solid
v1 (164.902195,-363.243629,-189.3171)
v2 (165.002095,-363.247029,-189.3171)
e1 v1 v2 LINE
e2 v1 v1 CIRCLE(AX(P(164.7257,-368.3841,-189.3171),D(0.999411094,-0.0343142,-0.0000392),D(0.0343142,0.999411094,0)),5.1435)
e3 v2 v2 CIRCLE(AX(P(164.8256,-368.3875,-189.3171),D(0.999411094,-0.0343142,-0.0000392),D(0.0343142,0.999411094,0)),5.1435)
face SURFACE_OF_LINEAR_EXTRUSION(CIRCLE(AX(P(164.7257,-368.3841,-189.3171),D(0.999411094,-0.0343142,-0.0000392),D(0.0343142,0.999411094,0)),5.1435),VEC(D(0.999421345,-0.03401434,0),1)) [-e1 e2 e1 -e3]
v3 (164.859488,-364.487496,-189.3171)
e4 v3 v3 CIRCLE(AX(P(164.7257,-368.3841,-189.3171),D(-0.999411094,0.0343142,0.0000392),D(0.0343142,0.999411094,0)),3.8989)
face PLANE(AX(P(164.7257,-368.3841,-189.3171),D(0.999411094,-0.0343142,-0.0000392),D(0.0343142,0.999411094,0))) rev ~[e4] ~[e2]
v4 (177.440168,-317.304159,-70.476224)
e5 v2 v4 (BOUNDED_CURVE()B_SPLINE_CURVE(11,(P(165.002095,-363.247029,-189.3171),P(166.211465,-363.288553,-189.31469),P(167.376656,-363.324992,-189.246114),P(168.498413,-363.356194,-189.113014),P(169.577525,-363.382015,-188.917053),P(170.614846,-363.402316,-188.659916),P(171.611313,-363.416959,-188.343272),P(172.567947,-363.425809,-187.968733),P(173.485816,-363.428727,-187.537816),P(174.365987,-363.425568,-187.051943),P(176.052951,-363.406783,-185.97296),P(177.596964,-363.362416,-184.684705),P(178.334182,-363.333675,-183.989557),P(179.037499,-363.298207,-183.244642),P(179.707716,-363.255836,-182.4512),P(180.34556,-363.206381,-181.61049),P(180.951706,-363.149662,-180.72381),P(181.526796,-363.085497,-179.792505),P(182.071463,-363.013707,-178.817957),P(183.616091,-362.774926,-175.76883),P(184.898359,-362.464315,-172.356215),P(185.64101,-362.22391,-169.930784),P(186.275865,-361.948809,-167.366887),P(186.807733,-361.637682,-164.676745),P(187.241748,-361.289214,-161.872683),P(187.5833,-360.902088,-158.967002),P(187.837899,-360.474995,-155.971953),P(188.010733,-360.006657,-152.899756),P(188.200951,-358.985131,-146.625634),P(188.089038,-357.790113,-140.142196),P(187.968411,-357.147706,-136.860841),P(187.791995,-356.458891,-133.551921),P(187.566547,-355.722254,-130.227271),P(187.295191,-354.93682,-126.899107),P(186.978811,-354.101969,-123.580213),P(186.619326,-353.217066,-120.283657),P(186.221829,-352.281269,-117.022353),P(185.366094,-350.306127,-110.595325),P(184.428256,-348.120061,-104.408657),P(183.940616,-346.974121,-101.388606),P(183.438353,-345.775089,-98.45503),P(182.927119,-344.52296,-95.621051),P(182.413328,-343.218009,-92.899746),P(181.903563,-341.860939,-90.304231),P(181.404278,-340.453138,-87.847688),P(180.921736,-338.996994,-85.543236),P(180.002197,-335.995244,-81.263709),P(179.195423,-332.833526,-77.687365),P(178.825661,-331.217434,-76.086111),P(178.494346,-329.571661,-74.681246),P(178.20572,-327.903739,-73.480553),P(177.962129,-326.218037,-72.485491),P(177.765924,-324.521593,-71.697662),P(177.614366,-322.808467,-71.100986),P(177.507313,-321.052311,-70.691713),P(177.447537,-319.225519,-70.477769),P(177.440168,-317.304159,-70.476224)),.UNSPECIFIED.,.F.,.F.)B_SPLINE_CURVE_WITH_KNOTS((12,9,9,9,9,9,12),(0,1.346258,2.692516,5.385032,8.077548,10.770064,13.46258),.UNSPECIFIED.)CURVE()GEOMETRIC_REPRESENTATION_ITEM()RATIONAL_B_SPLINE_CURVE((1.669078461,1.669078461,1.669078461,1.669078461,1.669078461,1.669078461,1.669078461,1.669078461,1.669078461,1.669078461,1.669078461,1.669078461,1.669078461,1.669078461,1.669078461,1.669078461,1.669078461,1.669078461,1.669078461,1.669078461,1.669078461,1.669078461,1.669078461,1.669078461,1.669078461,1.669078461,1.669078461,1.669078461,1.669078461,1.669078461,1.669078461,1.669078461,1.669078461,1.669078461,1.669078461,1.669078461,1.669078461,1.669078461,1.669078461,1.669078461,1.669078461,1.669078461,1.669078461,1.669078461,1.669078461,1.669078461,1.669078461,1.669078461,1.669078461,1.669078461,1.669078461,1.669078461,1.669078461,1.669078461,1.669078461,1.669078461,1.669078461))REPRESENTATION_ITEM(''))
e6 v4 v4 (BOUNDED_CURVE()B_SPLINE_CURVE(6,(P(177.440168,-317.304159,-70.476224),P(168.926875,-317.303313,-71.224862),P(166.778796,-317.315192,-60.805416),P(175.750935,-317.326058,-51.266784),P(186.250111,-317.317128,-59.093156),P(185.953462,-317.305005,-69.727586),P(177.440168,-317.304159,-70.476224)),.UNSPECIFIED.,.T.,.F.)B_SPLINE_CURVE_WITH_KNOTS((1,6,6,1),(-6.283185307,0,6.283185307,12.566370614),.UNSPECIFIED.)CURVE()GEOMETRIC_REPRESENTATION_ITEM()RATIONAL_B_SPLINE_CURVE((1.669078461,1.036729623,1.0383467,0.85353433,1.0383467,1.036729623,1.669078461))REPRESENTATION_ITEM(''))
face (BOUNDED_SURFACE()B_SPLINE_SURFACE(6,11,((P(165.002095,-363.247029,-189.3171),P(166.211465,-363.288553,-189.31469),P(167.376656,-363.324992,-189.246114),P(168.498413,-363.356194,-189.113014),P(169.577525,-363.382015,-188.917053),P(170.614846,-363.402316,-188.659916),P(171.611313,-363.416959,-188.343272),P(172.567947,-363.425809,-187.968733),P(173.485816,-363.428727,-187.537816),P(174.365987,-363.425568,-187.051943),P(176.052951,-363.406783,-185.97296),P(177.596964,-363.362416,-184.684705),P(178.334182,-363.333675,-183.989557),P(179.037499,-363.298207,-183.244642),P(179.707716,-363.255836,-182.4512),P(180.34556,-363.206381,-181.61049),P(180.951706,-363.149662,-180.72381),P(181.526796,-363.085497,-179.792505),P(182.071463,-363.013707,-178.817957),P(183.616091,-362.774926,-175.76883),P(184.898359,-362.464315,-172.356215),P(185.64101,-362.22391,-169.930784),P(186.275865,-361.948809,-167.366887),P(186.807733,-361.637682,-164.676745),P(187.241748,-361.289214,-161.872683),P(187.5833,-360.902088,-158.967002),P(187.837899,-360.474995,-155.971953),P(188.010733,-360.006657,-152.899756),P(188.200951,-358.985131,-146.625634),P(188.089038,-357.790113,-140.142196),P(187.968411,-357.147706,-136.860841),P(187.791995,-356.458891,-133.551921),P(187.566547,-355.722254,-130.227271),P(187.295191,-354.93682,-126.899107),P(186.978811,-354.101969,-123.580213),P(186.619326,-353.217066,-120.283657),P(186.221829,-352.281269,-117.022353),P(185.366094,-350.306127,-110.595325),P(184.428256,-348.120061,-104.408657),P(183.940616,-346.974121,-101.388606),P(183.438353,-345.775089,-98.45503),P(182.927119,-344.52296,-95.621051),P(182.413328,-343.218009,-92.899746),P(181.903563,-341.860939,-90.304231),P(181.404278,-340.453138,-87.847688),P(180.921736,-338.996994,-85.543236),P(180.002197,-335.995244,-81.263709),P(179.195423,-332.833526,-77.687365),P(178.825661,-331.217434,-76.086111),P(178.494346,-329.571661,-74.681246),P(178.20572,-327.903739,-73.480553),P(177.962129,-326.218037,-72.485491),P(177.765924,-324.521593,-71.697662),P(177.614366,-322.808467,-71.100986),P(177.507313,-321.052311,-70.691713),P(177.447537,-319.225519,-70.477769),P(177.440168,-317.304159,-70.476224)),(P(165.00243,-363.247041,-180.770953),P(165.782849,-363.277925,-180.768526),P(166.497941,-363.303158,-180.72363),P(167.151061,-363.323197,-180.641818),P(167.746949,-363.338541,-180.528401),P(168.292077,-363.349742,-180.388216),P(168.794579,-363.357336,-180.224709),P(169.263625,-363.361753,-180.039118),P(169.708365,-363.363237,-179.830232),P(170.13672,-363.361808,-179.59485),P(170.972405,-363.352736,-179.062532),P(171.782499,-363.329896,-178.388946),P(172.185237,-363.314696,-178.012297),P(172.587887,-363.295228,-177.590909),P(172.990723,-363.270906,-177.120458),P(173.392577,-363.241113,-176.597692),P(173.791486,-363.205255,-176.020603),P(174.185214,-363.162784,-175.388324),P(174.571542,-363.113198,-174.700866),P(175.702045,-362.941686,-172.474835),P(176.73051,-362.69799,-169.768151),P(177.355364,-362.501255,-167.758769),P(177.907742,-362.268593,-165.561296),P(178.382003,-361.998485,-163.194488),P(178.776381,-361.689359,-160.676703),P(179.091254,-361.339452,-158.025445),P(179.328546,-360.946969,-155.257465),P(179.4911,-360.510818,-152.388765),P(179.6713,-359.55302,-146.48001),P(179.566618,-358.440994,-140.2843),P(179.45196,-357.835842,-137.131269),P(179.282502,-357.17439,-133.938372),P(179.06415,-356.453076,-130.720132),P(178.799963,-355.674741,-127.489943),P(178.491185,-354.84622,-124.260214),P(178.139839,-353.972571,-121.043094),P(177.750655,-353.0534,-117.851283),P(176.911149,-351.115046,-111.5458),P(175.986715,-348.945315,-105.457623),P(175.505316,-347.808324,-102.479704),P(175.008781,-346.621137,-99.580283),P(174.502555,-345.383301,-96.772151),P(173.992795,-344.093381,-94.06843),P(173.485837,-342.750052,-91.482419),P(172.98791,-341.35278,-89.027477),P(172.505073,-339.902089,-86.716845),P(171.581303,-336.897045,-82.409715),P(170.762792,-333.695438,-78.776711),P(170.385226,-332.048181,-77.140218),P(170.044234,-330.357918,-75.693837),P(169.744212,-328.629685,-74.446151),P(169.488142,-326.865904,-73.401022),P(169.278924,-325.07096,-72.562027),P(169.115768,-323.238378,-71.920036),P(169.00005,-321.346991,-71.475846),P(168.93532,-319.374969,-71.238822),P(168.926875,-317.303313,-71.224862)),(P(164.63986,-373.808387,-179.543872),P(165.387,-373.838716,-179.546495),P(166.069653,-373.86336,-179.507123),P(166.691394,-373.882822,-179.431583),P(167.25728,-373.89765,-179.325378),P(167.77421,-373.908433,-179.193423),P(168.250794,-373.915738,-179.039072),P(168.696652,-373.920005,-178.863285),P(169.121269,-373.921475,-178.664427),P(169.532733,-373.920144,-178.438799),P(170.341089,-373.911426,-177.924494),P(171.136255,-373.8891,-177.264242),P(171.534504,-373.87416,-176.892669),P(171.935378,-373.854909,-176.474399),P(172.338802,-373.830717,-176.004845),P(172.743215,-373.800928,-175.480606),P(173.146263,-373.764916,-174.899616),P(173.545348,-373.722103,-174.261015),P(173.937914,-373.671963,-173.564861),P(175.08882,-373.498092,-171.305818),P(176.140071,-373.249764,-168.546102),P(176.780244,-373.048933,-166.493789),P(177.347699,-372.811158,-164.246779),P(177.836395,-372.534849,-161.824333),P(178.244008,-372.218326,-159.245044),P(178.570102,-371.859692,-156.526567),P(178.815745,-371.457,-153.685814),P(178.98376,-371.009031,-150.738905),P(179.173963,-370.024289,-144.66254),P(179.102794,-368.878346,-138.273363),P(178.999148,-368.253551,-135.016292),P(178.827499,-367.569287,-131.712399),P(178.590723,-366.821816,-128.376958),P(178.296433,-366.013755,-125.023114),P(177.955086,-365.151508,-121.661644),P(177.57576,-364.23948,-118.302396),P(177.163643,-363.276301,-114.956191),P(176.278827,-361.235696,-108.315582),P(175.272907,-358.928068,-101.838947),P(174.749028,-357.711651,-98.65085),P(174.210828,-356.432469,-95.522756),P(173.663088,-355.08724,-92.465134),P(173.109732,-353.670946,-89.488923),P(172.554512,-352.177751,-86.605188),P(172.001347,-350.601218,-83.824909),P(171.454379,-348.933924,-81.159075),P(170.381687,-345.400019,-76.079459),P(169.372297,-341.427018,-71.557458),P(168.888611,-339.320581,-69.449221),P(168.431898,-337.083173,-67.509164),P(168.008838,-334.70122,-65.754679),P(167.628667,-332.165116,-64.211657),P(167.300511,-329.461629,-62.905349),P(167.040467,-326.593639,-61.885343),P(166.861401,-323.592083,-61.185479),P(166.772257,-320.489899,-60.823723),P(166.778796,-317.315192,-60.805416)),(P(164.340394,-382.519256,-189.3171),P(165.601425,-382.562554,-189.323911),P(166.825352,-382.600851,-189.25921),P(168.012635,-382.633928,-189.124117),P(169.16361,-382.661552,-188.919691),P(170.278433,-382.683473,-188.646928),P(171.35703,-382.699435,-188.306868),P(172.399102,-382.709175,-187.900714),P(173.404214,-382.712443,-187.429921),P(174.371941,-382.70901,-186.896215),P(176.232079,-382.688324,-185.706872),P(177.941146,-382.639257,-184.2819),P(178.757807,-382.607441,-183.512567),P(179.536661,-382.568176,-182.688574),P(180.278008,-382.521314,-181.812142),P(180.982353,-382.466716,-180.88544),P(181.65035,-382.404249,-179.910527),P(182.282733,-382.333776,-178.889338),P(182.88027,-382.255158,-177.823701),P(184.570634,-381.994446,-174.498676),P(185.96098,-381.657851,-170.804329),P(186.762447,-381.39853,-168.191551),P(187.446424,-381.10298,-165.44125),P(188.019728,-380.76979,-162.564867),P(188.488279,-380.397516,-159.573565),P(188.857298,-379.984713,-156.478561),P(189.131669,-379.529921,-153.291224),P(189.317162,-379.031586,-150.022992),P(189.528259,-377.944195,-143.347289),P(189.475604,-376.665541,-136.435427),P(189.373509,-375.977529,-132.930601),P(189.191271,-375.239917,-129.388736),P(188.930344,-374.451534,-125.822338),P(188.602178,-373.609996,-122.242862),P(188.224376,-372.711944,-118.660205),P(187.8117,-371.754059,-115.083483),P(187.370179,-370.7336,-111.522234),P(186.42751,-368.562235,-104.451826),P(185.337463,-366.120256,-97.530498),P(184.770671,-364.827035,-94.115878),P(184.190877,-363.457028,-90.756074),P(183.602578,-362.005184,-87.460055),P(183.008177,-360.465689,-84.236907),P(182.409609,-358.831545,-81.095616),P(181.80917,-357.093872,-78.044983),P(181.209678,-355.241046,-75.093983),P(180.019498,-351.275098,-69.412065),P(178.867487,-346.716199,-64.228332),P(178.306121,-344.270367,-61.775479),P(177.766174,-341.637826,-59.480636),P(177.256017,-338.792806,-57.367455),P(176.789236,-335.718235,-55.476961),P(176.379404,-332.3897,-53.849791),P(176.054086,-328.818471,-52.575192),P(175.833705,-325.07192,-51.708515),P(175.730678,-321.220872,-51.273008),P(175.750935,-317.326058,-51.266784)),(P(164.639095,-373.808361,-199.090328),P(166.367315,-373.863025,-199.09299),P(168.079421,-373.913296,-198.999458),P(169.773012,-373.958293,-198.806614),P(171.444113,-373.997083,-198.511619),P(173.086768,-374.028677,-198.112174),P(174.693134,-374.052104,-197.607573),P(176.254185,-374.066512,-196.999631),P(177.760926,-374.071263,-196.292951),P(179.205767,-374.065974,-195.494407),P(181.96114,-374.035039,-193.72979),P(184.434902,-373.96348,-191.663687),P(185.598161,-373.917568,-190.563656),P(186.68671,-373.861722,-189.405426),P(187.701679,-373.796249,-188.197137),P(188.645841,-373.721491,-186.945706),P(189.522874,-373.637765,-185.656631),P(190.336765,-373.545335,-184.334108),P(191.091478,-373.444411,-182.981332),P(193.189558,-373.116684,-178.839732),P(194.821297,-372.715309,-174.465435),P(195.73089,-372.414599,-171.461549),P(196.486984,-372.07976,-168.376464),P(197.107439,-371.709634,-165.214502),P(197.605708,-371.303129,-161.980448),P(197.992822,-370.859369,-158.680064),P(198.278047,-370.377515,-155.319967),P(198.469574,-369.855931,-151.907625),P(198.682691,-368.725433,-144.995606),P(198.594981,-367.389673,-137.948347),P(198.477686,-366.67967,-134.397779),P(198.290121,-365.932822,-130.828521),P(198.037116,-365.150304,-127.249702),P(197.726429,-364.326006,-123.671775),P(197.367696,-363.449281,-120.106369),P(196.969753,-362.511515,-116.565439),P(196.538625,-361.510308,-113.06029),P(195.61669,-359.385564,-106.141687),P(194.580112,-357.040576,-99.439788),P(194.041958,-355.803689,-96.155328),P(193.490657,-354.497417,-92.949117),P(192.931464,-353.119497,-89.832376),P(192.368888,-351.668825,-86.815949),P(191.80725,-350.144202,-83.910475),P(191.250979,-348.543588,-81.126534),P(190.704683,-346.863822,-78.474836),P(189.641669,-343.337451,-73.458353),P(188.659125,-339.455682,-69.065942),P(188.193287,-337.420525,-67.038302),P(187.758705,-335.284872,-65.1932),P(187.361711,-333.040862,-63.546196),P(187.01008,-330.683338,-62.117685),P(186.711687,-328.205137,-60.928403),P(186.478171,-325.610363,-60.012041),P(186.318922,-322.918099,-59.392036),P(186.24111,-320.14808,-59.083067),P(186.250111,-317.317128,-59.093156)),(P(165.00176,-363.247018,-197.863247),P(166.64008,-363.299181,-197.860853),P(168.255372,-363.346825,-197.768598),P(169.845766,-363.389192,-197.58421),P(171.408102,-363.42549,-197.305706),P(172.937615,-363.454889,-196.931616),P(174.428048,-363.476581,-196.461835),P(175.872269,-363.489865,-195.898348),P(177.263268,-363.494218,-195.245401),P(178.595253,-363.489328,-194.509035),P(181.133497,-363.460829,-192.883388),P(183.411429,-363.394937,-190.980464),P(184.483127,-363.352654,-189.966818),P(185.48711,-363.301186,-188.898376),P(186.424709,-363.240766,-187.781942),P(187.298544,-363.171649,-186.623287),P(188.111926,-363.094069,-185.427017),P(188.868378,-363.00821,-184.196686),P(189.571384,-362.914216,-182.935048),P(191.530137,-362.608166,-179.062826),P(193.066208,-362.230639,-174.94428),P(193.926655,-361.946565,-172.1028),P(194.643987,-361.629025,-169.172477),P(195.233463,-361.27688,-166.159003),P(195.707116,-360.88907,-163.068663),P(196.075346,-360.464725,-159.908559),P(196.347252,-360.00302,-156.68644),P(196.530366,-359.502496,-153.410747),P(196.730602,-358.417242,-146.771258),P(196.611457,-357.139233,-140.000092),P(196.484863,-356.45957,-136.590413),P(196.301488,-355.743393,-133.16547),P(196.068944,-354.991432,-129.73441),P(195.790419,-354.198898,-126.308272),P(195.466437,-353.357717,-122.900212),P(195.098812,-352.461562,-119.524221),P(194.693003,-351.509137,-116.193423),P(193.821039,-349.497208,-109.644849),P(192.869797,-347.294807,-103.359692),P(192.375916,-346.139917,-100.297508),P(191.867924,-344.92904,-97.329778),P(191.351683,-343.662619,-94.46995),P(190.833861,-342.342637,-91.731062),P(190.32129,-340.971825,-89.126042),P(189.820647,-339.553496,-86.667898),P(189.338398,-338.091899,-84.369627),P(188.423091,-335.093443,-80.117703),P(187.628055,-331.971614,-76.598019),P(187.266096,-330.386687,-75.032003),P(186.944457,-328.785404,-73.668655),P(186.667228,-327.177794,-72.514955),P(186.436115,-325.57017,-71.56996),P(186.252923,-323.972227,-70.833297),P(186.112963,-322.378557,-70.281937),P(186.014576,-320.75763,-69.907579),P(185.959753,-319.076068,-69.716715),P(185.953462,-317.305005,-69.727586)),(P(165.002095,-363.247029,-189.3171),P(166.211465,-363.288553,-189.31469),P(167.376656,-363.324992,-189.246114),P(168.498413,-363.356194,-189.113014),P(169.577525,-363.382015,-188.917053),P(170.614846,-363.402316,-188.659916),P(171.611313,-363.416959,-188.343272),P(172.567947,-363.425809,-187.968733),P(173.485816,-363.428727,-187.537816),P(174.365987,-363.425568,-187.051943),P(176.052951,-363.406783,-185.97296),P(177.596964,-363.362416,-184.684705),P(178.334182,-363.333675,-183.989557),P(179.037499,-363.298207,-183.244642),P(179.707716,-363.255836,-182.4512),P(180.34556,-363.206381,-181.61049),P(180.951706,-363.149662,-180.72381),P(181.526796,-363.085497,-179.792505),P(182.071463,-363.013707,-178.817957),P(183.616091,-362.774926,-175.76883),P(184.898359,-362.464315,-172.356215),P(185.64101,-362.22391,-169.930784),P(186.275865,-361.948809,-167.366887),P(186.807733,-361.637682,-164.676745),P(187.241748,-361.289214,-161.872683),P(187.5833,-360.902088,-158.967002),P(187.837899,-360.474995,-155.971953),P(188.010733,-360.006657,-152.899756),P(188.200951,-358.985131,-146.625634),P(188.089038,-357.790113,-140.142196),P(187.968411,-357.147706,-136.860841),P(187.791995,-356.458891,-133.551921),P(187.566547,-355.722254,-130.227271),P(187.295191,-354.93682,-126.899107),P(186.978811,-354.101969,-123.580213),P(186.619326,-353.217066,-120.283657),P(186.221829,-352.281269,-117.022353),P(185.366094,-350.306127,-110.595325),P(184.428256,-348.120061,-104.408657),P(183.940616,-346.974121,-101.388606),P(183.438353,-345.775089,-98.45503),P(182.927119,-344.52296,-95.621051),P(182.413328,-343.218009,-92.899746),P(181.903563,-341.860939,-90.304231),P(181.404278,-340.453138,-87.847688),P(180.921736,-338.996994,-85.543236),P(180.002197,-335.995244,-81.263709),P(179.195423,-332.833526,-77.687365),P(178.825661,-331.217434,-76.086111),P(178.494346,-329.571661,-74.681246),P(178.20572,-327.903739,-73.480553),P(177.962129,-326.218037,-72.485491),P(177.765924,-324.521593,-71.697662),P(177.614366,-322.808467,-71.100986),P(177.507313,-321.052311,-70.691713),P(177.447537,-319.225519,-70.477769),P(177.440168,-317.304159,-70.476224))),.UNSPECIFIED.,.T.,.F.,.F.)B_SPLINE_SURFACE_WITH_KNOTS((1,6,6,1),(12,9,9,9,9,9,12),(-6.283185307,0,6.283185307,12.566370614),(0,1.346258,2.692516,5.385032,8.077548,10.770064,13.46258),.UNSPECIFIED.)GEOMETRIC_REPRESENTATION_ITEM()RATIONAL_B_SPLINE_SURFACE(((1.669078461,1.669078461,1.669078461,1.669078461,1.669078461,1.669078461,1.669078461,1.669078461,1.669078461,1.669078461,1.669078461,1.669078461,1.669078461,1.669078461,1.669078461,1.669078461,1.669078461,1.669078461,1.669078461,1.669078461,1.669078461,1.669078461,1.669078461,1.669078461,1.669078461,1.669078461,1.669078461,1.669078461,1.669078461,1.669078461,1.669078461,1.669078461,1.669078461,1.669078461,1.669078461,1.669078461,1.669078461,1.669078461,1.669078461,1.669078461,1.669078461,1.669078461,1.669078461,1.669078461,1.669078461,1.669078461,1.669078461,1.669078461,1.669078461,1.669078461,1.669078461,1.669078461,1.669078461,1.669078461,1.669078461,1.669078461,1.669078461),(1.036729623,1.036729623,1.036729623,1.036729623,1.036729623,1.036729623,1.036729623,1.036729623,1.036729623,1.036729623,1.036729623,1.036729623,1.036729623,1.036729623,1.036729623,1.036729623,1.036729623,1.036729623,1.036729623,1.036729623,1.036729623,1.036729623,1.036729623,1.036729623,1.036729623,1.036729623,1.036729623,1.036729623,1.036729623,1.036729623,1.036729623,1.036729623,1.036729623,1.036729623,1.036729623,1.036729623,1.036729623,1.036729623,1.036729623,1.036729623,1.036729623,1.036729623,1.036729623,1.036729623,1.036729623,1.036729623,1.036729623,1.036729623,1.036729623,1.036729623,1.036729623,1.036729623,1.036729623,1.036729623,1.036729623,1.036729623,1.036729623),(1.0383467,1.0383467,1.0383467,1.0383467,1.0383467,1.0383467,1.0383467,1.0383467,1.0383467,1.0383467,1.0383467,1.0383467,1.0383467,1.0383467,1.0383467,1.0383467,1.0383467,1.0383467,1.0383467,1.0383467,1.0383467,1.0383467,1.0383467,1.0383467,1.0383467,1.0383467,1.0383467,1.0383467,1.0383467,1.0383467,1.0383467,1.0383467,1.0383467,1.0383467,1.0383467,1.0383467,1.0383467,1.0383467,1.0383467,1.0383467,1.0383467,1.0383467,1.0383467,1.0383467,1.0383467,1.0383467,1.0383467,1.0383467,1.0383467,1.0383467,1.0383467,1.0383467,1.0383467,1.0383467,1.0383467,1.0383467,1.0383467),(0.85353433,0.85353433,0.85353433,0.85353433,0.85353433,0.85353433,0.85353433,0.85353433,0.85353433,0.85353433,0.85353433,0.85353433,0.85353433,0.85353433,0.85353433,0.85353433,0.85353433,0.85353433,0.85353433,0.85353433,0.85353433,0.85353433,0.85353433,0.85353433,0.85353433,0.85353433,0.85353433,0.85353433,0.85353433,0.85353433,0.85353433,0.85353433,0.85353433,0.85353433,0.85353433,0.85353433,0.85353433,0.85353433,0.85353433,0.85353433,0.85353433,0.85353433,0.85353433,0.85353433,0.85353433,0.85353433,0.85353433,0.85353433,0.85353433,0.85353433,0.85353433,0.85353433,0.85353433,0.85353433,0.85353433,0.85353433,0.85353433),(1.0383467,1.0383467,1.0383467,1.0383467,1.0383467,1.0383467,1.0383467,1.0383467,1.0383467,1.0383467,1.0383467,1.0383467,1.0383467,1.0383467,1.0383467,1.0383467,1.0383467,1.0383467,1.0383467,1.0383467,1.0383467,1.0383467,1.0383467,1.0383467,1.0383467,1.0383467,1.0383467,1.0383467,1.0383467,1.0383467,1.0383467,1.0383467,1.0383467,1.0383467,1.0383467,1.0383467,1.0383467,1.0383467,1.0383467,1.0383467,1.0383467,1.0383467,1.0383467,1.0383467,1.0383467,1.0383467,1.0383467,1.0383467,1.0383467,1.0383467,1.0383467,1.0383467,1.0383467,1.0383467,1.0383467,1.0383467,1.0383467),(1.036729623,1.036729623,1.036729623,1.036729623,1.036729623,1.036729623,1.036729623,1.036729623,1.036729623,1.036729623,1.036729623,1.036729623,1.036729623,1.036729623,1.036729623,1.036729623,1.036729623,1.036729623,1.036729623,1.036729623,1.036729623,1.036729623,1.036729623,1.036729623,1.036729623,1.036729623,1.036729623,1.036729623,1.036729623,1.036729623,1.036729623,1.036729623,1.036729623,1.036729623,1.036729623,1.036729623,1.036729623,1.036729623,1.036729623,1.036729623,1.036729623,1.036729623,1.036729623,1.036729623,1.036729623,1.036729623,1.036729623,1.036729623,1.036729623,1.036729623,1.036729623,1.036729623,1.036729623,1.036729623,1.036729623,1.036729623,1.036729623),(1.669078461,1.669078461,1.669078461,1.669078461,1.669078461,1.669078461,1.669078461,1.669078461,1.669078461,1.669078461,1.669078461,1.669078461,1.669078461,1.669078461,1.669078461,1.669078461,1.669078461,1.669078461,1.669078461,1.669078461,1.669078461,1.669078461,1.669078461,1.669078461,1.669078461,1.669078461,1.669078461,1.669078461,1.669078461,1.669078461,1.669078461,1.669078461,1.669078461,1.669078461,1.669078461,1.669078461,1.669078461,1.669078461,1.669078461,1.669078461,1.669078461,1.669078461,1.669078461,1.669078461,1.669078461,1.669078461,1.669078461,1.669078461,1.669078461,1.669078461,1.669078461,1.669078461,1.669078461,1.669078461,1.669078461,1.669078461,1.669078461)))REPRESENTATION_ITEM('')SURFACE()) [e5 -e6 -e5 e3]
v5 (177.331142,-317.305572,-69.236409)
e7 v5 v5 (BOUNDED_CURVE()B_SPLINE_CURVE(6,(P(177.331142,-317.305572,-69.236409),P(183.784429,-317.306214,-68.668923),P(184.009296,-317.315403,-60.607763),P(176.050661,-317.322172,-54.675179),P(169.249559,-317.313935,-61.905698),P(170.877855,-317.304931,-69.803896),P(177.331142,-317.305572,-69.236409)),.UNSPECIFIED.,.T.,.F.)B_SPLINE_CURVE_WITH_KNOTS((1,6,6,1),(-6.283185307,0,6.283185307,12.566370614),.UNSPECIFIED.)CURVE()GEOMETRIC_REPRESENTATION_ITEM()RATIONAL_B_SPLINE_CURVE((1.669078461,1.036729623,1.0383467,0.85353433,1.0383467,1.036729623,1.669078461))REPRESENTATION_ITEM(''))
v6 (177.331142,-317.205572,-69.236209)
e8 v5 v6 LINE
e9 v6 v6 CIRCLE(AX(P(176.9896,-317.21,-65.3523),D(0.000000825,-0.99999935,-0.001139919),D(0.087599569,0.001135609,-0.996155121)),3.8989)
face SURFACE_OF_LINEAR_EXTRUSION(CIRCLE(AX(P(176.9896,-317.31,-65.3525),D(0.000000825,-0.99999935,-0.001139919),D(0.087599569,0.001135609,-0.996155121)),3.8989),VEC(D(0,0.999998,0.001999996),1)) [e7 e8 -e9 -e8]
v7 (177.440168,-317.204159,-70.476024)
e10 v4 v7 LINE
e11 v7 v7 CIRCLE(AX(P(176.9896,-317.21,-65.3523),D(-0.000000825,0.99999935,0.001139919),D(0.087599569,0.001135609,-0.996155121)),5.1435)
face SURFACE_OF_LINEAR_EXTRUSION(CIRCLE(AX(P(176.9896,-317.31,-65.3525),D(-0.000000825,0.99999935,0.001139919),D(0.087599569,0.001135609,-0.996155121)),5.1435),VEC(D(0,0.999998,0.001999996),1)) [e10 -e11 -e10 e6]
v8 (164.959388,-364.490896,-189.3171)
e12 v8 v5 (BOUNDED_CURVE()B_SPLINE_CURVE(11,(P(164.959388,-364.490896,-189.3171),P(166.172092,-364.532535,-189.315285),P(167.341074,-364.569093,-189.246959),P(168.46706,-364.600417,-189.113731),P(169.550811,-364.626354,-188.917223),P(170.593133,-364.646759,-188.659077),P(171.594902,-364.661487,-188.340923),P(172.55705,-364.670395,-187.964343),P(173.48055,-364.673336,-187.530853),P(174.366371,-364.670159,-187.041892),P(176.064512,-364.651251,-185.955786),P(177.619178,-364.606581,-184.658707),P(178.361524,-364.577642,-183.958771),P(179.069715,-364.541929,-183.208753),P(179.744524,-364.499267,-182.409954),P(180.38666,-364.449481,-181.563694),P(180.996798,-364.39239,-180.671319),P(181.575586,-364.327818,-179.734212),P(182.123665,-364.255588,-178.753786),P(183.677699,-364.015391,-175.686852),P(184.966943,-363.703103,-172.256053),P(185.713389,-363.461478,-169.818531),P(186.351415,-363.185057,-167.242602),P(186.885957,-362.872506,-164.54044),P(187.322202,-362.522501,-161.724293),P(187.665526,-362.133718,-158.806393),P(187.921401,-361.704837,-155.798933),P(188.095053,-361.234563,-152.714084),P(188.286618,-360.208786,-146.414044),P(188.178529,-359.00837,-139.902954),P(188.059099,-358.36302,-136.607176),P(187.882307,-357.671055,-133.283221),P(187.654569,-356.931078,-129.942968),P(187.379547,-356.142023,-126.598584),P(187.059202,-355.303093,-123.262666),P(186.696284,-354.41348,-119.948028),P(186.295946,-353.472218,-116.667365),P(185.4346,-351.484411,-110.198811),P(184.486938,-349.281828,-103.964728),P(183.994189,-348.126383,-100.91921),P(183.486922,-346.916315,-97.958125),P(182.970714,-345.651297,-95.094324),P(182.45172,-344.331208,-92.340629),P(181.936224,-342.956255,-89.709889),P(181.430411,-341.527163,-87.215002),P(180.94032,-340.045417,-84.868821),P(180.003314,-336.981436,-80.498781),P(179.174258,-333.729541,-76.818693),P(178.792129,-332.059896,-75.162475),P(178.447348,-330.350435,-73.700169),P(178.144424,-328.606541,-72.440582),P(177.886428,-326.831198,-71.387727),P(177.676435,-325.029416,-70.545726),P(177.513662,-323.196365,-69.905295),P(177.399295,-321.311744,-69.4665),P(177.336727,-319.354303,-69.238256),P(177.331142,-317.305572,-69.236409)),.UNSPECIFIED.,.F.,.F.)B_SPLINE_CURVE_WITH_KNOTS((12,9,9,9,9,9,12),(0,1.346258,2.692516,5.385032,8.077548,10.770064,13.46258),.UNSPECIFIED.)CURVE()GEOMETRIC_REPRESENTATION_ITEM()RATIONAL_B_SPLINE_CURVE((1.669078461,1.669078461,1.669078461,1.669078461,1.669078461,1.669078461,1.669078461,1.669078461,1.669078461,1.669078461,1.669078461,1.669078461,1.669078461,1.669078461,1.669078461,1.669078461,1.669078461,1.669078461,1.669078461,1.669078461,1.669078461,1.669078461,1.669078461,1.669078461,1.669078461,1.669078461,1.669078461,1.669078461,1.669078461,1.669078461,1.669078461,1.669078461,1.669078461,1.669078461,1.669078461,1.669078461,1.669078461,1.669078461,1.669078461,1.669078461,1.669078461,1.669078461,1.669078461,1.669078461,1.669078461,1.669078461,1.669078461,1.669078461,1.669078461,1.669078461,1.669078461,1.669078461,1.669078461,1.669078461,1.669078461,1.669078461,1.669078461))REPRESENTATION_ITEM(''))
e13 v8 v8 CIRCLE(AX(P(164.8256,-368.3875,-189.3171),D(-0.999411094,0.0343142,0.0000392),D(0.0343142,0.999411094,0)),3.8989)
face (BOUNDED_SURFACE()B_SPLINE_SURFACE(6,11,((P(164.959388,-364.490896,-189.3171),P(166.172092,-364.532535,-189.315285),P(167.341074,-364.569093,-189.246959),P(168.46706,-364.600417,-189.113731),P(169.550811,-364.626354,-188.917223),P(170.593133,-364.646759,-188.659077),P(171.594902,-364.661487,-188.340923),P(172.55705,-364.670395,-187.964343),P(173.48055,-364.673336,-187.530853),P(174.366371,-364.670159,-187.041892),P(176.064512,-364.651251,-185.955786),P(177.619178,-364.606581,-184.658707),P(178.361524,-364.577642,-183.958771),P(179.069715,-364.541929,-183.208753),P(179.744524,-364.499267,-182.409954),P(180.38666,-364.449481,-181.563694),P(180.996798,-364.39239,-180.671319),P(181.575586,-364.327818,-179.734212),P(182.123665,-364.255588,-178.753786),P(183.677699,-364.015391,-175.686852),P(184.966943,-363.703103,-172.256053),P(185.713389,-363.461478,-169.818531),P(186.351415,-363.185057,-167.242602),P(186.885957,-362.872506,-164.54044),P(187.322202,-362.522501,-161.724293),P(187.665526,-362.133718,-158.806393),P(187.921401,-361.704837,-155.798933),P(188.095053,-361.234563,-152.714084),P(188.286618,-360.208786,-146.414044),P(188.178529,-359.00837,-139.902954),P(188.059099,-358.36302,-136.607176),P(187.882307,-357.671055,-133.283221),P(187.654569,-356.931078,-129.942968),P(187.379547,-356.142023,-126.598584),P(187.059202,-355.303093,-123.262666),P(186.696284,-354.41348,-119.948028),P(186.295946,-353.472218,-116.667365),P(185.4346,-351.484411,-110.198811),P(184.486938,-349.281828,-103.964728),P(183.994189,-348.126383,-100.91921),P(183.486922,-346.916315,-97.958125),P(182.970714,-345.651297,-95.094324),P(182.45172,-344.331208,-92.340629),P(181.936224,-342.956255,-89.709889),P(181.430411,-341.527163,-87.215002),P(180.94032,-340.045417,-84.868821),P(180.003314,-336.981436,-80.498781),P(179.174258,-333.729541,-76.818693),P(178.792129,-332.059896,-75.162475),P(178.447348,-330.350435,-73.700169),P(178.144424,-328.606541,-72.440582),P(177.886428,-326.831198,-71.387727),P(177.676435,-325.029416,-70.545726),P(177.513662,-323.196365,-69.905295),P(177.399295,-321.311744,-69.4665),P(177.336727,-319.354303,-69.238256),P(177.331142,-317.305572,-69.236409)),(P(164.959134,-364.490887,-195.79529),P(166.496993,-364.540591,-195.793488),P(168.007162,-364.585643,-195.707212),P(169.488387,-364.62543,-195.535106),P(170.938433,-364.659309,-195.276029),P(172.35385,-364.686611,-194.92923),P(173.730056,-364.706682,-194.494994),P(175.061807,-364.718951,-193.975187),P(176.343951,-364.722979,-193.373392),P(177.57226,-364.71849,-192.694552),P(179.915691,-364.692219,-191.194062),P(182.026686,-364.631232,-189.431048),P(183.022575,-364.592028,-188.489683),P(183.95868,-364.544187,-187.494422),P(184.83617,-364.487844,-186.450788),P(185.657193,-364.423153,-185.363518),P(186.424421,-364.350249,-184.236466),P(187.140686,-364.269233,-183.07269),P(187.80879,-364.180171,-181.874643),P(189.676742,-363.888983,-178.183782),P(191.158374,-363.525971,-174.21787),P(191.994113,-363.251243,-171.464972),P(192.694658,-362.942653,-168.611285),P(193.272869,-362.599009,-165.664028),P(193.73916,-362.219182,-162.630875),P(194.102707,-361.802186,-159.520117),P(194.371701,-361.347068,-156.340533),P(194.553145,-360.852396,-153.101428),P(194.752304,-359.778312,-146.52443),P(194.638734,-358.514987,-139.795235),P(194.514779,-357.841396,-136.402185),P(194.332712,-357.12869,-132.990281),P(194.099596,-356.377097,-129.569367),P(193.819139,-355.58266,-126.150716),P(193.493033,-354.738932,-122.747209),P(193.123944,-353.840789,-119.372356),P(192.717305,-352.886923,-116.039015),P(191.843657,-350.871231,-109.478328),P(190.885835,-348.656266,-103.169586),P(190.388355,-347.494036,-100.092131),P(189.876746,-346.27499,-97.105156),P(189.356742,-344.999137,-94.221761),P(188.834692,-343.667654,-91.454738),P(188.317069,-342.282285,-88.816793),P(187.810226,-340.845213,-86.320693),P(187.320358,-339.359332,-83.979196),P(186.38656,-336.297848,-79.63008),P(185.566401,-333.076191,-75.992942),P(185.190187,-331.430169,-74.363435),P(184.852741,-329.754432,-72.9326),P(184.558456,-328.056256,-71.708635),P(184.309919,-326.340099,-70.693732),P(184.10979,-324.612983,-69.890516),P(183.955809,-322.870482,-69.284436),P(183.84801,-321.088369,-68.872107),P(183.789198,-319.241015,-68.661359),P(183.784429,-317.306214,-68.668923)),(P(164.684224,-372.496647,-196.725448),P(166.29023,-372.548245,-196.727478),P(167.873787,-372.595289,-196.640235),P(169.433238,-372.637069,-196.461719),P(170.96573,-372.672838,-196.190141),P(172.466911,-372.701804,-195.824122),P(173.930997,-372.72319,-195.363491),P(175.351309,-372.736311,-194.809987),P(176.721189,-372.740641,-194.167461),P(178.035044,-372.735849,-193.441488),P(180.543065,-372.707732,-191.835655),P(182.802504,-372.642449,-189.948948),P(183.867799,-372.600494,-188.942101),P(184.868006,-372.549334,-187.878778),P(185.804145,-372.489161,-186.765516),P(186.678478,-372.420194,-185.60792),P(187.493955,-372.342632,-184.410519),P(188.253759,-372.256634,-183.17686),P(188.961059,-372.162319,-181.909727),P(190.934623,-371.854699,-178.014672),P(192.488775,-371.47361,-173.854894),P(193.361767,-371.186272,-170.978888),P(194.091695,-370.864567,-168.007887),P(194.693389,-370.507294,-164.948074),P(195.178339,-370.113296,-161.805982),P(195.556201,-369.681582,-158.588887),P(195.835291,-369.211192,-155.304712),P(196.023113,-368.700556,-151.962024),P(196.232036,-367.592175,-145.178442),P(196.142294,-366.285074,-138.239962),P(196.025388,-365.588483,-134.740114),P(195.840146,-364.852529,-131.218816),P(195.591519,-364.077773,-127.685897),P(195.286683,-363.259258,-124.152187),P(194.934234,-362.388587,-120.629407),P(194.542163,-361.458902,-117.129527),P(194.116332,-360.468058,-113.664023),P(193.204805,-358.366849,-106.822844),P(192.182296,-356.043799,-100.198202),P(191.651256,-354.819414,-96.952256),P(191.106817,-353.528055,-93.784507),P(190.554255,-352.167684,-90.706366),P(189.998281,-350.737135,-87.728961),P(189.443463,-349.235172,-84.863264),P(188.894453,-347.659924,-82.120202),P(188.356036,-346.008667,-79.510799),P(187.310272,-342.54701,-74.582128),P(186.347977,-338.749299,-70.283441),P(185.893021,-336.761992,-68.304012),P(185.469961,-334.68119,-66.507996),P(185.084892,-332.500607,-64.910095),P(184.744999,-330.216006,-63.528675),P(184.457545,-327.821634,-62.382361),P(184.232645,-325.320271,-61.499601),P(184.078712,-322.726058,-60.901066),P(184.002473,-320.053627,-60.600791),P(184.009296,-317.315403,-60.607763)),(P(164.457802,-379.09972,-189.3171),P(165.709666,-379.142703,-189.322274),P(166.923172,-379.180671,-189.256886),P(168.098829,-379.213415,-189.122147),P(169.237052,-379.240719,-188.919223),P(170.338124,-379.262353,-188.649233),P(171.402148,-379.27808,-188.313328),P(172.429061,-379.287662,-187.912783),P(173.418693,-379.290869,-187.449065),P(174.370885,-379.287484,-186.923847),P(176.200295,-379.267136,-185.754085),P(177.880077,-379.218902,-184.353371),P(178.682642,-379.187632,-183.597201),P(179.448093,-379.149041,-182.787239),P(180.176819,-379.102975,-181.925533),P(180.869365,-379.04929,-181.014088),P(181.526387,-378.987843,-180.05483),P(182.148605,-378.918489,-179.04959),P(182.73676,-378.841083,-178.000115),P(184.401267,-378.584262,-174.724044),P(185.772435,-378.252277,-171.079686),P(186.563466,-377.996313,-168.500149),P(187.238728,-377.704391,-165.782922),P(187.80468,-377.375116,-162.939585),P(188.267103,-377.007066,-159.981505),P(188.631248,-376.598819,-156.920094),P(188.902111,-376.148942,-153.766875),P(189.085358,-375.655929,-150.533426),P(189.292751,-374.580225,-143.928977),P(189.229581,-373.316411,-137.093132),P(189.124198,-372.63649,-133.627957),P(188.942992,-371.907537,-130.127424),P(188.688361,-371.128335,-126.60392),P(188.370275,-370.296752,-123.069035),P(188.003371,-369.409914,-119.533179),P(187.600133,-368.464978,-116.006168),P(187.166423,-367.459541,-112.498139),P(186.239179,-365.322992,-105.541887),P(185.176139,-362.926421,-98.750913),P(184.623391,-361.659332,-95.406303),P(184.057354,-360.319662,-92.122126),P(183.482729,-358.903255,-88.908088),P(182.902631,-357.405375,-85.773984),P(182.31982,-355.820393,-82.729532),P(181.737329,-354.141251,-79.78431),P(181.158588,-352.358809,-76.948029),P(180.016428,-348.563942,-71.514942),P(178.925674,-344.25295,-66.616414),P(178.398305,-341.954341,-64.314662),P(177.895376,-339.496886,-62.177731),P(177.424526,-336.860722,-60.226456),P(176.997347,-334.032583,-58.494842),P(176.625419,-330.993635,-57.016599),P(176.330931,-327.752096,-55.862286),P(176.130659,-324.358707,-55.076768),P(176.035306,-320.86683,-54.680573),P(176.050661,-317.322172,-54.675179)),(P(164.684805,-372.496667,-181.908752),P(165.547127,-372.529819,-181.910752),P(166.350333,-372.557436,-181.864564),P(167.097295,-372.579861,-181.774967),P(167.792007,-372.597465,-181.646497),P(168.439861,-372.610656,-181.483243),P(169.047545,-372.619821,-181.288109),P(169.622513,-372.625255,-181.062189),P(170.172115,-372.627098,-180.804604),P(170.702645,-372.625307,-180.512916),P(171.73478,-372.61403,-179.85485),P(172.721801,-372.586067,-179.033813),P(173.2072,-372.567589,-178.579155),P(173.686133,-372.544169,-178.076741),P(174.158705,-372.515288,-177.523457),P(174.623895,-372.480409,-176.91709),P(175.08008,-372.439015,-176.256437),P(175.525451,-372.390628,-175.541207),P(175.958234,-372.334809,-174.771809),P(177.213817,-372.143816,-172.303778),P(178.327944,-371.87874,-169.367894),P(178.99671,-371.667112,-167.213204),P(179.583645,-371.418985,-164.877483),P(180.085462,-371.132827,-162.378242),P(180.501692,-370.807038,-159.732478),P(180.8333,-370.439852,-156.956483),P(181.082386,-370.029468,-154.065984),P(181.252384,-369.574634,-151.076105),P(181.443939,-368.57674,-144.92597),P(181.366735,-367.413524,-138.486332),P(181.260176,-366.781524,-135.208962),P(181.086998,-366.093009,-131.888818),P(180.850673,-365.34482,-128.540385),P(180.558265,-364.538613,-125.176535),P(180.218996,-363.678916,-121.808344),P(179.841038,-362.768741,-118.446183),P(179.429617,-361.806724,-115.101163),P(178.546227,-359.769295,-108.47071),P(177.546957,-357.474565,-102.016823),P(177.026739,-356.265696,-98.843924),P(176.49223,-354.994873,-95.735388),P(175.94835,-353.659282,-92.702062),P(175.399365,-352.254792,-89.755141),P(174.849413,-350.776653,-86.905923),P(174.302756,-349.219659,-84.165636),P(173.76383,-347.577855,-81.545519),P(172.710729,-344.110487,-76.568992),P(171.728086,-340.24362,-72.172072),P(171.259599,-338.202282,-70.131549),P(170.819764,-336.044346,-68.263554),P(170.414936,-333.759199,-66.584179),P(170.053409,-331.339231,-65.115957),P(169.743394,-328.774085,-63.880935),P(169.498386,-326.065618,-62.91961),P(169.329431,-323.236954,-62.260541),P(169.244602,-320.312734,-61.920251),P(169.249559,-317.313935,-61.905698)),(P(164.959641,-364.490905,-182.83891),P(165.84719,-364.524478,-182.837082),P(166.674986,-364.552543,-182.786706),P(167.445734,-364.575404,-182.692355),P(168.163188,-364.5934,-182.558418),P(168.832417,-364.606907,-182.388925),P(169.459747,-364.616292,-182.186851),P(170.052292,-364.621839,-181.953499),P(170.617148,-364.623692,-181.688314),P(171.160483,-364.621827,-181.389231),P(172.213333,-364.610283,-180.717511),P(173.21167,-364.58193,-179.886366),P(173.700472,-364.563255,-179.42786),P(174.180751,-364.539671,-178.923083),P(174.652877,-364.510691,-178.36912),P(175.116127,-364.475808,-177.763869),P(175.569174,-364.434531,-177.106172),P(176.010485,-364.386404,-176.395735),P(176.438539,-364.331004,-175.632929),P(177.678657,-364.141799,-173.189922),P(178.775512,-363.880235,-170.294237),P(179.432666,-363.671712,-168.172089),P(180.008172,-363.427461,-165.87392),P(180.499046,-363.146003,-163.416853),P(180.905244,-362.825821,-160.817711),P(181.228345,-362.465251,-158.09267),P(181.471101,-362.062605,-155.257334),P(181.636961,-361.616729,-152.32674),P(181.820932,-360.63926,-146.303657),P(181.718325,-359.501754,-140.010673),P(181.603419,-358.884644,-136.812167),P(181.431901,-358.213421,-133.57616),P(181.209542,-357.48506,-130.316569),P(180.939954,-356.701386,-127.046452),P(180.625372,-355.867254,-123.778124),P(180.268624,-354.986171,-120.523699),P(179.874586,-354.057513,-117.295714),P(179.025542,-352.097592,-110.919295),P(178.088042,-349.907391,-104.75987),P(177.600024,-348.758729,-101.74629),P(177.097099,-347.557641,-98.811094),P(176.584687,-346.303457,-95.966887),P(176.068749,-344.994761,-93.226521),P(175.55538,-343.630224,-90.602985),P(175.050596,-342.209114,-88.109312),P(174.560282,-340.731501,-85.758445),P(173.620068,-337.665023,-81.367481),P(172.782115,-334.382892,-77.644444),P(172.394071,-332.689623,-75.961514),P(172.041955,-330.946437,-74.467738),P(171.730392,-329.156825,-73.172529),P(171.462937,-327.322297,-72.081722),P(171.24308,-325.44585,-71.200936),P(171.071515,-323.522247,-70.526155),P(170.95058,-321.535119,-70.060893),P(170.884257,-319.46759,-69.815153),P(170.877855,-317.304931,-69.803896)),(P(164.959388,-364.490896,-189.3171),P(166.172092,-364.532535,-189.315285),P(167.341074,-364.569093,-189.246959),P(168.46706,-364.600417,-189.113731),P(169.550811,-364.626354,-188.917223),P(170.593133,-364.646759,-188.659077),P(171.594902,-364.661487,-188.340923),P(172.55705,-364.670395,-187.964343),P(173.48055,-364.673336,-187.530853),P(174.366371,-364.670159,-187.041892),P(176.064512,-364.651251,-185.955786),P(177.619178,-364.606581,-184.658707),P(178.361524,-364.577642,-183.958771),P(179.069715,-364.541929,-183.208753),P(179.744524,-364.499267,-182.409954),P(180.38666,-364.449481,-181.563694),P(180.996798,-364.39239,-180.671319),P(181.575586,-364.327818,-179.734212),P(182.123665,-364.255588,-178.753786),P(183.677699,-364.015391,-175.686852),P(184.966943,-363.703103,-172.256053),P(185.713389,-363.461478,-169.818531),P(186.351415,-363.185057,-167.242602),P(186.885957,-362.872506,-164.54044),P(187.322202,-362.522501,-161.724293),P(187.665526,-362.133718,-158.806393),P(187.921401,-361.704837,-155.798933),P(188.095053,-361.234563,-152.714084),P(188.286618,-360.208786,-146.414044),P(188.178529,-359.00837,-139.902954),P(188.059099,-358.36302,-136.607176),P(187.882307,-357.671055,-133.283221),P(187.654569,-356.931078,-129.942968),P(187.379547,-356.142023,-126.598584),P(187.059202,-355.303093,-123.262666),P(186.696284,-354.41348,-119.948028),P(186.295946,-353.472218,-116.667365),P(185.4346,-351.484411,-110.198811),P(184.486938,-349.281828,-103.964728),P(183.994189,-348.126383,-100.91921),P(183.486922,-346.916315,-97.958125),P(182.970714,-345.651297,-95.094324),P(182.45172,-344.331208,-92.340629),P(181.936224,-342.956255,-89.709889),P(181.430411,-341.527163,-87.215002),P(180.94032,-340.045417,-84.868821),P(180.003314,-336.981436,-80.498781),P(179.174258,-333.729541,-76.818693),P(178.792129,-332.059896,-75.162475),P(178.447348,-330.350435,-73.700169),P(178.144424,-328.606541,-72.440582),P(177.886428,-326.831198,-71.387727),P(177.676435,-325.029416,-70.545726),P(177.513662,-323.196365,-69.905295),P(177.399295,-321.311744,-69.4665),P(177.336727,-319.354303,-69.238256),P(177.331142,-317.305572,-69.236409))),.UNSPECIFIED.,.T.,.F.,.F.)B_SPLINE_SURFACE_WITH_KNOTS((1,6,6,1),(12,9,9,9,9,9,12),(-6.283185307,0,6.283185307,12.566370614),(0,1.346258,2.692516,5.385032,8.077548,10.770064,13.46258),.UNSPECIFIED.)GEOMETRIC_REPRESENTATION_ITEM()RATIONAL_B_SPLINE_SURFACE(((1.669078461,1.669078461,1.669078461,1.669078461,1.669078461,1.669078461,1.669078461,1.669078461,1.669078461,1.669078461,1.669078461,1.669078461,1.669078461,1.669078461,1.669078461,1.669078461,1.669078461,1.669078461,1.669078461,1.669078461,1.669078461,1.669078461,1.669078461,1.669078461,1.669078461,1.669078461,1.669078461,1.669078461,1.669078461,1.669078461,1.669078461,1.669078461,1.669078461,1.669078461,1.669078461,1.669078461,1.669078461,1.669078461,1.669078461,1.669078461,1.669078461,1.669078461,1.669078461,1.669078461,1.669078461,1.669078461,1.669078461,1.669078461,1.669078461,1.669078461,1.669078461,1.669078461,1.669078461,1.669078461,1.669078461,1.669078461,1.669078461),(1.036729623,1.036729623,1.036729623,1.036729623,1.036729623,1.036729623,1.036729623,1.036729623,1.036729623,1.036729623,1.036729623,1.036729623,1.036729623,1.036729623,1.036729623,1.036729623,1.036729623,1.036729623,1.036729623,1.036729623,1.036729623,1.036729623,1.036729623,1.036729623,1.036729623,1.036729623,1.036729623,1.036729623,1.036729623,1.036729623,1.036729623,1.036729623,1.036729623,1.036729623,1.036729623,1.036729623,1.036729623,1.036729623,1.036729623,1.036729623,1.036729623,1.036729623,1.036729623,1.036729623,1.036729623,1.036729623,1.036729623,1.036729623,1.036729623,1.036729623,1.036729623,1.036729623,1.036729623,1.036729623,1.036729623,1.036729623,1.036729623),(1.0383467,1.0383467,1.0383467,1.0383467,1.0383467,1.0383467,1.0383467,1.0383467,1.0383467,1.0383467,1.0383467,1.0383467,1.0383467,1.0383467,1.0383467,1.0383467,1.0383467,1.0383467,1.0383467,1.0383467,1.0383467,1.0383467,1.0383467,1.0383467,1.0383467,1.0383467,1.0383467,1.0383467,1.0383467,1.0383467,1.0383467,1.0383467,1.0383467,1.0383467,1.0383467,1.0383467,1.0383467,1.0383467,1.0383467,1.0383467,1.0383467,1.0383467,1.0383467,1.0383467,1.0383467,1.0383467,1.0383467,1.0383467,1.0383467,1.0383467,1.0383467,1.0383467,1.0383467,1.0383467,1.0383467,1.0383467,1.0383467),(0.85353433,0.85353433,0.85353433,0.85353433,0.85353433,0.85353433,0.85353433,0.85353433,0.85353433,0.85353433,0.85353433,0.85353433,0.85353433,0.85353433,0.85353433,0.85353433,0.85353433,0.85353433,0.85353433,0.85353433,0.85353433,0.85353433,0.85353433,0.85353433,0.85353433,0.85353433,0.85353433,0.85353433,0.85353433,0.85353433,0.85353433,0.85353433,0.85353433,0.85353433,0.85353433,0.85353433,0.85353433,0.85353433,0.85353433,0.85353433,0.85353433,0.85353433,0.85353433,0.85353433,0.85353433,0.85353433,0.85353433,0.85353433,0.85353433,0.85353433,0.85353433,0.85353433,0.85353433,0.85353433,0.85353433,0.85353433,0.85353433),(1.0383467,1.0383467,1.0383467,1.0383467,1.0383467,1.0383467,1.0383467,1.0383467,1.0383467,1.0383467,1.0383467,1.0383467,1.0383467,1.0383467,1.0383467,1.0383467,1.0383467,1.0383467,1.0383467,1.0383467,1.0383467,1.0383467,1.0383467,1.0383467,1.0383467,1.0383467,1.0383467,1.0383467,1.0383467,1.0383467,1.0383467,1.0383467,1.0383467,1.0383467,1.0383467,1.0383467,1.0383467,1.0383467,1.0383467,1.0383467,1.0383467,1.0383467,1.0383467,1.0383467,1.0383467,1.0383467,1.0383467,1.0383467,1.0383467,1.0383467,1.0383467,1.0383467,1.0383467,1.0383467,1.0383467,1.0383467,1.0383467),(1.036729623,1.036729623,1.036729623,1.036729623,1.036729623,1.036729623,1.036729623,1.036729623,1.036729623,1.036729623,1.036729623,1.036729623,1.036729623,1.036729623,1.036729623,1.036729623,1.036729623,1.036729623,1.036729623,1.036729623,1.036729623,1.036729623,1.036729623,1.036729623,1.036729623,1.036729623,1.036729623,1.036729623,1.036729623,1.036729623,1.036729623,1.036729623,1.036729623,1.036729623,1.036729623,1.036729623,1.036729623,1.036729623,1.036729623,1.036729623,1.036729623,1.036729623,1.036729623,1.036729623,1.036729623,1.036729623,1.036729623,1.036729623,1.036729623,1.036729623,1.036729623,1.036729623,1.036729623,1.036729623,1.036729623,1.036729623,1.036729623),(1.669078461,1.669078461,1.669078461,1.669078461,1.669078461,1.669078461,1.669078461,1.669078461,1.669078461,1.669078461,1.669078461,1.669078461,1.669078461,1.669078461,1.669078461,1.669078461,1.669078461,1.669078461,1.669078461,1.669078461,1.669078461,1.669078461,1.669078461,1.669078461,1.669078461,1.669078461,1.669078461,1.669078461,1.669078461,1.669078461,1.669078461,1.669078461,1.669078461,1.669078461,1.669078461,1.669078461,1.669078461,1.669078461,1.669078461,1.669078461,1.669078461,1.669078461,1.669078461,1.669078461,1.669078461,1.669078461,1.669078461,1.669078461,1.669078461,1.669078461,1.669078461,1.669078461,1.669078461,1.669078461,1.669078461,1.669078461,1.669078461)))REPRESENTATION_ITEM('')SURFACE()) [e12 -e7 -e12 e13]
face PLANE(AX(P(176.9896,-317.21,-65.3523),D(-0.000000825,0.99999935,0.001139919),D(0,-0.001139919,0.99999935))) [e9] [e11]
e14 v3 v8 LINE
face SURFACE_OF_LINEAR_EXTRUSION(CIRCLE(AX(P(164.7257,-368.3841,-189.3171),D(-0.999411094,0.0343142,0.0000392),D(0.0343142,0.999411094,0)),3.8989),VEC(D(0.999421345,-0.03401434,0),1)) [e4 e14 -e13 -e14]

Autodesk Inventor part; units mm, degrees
ref_plane "YZ Plane" through (0, 0, 0) normal (1, 0, 0) x (0, 1, 0)
ref_plane "XZ Plane" through (0, 0, 0) normal (0, 1, 0) x (-1, 0, 0)
ref_plane "XY Plane" through (0, 0, 0) normal (0, 0, 1) x (1, 0, 0)
ref_plane "Work Plane1" through (164.8256, -368.3875, -189.3171) normal (0.9994111, -0.0343142, -0.0000392) x (0.0343142, 0.9994111, 0)
sketch "Sketch3" plane through (164.8256, -368.3875, -189.3171) normal (0.9994111, -0.0343142, -0.0000392) x (0.0343142, 0.9994111, 0)
  circle A0 centre (0, 0) radius 5.1435
  circle A1 centre (0, 0) radius 3.8989
  point P0 (0, 0)
sketch3d "3D Sketch1"
  line L0 (164.7257, -368.3841, -189.3171) -> (164.8256, -368.3875, -189.3171)
  spline S0 degree 3 poles (164.8256, -368.3875, -189.3171) (209.6744, -369.9274, -189.3189) (176.9896, -362.1852, -65.4037) (176.9896, -317.31, -65.3525) knots 0 0 0 0 13.46258 13.46258 13.46258 13.46258
  line L1 (176.9896, -317.31, -65.3525) -> (176.9896, -317.21, -65.3523)
  dimension "d8" = 1
  dimension "d9" = 1
sweep "Sweep1" add profiles "Sketch3" path "3D Sketch1"
equation "\"OD\" = 10.287"
equation "\"t\" = 1.2446"
equation "\"L\" = PL"
equation "\"ID\" = 7.7978"
equation "\"PL\" = 155.7274"
equation "\"Size_Designation\" = 1.2345"
equation "\"RPL\" = 158.75"
equation "\"OPL\" = 155.7274"
equation "\"ROPL\" = 158.75"
properties material "Stainless Steel"
